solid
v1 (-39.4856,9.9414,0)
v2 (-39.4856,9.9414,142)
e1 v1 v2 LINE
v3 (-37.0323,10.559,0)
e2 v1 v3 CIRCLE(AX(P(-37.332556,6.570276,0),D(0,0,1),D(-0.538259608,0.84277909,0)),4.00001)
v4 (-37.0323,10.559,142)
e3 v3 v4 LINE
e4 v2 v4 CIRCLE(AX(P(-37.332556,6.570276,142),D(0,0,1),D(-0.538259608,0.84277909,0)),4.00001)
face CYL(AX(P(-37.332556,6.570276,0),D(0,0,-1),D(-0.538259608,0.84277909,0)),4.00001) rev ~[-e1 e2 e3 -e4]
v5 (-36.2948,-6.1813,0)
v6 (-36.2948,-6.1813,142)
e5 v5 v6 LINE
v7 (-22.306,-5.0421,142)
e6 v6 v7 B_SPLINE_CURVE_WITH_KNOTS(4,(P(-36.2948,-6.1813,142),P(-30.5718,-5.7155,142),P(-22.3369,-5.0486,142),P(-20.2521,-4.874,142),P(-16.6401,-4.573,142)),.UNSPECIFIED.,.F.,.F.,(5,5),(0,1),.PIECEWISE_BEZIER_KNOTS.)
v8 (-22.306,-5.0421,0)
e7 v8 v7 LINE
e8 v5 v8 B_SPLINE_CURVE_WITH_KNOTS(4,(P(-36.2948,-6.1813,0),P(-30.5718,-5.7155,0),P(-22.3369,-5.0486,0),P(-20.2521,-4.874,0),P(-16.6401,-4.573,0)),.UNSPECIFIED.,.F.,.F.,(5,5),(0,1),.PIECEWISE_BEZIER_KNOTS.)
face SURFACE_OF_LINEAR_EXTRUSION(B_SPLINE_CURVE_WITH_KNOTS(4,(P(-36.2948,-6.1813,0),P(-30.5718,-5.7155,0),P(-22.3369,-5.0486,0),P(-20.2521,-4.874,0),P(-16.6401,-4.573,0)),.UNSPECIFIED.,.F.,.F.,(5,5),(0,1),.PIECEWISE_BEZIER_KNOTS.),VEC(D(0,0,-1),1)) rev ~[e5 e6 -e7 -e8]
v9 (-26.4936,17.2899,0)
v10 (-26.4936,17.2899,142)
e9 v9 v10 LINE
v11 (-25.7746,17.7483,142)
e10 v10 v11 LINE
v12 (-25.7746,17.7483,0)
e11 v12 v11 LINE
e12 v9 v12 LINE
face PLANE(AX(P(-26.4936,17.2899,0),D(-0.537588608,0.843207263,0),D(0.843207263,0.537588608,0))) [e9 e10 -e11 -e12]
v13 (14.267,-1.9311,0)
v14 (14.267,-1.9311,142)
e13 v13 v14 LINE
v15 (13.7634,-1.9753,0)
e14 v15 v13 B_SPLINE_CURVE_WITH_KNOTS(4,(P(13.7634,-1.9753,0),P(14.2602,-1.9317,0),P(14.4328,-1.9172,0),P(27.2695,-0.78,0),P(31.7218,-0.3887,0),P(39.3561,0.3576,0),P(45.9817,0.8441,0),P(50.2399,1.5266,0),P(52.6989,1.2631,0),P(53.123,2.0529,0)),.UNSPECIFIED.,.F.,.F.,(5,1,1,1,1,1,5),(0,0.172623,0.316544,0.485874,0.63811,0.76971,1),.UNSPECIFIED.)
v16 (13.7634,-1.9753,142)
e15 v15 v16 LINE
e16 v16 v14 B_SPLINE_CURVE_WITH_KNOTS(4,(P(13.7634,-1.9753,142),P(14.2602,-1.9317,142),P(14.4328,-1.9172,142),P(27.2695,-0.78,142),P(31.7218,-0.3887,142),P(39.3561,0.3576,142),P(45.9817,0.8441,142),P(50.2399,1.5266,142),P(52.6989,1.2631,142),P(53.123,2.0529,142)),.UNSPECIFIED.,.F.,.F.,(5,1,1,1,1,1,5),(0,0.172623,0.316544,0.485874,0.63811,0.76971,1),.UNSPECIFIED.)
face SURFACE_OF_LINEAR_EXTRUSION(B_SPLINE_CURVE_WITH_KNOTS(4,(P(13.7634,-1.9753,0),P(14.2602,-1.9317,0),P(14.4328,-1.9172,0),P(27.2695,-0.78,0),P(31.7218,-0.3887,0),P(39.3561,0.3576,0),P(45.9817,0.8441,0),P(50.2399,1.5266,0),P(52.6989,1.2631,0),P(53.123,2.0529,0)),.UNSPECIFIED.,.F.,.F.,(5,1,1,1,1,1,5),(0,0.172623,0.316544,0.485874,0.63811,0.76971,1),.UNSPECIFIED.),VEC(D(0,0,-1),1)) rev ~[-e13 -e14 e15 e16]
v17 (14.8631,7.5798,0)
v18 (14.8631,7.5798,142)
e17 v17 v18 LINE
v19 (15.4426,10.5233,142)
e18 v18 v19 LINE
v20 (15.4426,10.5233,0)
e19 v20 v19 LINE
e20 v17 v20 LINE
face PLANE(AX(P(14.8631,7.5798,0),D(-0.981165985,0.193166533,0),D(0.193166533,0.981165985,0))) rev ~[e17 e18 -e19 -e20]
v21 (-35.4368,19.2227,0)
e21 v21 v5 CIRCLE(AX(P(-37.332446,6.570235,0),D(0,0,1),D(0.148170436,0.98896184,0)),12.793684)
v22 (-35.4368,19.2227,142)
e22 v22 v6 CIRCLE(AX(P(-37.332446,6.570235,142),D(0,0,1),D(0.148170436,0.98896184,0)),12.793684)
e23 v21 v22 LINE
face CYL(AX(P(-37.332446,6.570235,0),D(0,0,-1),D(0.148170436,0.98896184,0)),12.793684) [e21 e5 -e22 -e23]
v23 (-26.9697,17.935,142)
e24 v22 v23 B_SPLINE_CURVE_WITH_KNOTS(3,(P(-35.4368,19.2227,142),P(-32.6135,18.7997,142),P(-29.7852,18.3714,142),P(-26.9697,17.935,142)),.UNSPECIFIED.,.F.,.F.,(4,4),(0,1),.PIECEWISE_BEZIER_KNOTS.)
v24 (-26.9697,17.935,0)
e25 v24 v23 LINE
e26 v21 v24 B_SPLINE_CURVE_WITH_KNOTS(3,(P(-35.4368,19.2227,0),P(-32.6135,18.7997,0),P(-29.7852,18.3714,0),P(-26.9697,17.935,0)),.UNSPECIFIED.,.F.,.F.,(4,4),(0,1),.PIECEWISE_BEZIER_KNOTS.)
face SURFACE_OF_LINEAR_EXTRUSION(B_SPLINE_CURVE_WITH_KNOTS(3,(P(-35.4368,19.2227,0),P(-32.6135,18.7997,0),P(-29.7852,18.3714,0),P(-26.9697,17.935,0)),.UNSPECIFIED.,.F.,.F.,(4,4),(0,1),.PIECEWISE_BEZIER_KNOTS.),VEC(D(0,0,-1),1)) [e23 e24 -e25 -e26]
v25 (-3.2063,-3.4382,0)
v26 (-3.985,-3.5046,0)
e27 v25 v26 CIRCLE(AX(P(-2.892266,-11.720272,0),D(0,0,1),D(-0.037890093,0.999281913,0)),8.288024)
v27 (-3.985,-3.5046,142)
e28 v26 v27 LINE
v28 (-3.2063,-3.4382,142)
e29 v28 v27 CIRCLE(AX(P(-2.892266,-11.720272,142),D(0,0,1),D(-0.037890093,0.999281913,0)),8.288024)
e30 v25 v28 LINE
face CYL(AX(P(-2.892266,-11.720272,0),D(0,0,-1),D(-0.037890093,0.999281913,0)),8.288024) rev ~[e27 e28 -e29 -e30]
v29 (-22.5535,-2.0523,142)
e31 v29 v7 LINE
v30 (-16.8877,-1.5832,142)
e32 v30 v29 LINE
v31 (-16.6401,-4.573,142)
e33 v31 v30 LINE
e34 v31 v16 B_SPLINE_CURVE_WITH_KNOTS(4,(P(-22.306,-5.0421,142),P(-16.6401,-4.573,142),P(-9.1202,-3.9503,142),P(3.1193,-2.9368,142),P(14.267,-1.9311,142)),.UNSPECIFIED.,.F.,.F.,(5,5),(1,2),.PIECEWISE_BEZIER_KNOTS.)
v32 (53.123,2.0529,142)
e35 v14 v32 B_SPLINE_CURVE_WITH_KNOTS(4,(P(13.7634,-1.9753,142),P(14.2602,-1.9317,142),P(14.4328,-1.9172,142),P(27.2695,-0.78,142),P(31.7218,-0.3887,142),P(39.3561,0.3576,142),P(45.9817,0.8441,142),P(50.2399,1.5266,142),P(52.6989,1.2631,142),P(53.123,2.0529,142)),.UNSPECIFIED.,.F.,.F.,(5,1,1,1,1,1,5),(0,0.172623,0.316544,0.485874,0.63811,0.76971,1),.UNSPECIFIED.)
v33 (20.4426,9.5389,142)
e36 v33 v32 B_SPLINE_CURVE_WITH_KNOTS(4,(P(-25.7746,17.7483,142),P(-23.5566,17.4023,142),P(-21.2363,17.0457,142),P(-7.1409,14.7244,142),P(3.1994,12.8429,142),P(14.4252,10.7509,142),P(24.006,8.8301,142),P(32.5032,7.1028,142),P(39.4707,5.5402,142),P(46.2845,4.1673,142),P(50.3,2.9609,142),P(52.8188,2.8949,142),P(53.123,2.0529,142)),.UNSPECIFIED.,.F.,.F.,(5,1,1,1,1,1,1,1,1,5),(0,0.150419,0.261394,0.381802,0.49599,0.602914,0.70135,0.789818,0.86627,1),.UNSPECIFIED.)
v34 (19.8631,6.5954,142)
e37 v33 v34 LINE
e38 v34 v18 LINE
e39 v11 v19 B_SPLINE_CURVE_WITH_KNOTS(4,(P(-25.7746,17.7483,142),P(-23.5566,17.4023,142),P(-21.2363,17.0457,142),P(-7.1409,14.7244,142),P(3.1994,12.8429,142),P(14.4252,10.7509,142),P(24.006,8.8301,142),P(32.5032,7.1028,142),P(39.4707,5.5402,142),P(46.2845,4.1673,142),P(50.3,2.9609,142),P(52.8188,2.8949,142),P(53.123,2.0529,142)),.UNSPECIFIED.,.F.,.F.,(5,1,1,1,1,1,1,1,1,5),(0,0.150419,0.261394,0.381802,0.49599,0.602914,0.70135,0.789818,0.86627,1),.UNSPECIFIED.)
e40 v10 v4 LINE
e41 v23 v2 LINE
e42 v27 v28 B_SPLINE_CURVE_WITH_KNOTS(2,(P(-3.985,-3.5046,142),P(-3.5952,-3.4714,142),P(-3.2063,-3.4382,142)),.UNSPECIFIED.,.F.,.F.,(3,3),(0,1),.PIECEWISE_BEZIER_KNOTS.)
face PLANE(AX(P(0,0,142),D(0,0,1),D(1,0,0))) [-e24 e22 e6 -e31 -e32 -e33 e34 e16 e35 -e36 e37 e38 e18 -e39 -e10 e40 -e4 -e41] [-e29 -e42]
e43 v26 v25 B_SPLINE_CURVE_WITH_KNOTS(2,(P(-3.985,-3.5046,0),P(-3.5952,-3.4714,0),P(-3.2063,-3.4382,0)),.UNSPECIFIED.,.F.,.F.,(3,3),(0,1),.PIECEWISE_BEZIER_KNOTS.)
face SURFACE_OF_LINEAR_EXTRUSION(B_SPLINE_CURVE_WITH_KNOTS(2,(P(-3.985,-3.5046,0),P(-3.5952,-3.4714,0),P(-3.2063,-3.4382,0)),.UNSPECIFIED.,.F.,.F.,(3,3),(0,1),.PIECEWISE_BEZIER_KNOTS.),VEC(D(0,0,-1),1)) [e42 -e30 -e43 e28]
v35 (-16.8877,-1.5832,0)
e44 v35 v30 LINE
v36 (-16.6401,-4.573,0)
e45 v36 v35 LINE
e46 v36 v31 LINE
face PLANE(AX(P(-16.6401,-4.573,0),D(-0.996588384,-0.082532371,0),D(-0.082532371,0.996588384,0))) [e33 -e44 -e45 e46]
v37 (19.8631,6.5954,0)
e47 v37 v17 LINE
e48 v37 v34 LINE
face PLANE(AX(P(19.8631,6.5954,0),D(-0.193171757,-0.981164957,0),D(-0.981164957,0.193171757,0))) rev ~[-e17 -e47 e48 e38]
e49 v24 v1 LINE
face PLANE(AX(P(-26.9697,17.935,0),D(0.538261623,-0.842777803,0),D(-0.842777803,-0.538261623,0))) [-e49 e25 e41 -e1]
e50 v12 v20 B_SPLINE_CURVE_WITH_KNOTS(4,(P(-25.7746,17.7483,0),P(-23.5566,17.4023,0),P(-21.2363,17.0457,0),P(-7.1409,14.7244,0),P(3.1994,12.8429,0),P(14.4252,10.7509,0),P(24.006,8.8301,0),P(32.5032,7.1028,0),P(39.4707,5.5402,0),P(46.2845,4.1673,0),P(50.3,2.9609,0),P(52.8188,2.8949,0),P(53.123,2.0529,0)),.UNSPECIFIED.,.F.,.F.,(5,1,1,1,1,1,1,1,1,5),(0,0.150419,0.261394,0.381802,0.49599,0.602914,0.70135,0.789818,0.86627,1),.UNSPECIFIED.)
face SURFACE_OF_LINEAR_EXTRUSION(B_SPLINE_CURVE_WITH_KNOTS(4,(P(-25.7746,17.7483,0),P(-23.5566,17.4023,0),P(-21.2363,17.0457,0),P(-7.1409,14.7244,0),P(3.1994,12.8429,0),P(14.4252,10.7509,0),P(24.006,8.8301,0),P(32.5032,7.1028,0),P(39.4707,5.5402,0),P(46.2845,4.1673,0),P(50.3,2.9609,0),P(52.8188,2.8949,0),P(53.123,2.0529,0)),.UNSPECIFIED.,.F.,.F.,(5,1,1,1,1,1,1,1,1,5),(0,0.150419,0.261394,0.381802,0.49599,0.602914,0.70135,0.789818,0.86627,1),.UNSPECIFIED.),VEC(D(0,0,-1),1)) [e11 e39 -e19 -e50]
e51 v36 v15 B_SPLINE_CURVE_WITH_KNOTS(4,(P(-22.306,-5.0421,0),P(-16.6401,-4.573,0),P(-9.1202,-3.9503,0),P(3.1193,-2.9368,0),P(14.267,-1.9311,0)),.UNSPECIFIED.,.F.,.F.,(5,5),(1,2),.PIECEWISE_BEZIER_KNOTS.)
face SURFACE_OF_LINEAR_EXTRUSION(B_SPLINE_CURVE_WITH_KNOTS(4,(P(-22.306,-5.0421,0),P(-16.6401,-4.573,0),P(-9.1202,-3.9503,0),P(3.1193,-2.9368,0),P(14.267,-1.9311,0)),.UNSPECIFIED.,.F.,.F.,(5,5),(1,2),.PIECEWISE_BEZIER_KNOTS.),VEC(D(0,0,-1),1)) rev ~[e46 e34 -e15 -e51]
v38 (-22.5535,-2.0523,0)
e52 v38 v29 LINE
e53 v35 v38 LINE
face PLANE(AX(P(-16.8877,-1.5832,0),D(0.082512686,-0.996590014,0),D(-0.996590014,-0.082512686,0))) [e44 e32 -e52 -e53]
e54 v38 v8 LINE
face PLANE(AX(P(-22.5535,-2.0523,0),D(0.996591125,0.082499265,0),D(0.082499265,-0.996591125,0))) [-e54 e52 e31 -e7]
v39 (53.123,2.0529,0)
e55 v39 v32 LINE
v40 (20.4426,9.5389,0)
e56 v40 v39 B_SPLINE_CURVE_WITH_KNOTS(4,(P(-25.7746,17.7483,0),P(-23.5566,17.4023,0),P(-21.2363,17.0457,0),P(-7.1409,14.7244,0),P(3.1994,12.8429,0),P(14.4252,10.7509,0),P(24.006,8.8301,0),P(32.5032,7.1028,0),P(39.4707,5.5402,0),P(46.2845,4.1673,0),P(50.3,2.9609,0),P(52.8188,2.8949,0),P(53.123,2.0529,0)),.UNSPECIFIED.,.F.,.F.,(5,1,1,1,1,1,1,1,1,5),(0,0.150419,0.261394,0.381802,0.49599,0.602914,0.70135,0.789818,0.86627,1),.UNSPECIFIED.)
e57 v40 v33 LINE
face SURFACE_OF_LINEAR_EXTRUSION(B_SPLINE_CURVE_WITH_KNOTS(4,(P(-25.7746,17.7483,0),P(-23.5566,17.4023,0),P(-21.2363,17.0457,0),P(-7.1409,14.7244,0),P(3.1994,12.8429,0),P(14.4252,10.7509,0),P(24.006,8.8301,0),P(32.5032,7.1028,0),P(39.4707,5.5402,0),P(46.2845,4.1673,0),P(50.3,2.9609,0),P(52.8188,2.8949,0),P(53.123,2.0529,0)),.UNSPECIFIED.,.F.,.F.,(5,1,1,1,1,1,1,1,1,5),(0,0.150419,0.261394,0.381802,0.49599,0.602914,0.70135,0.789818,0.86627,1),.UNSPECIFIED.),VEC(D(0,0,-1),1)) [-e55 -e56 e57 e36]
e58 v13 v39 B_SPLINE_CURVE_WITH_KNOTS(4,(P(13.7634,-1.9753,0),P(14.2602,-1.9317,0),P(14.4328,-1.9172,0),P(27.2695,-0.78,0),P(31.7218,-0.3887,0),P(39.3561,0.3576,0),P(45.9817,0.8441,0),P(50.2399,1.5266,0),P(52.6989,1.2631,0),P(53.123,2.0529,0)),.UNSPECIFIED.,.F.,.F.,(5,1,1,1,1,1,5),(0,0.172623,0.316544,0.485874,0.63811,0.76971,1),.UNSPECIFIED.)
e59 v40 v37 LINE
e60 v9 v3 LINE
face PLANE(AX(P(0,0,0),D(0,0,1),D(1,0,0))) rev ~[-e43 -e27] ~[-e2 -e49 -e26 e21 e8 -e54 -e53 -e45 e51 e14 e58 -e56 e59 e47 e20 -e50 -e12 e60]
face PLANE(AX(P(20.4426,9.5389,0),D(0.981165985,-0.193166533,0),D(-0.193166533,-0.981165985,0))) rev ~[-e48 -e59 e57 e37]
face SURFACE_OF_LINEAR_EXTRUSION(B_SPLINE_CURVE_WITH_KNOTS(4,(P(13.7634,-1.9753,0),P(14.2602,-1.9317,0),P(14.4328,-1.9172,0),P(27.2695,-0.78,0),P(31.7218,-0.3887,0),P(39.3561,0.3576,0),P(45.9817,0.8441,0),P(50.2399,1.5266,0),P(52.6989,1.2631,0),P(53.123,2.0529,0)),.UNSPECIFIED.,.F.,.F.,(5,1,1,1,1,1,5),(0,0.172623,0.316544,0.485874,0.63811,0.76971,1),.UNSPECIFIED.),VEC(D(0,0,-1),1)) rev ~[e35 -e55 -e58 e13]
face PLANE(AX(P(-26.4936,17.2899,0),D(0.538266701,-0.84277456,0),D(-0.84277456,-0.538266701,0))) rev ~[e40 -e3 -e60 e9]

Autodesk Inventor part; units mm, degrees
ref_plane "YZ Plane" through (0, 0, 0) normal (1, 0, 0) x (0, 1, 0)
ref_plane "XZ Plane" through (0, 0, 0) normal (0, 1, 0) x (-1, 0, 0)
ref_plane "XY Plane" through (0, 0, 0) normal (0, 0, 1) x (1, 0, 0)
sketch "Sketch1" plane through (0, 0, 0) normal (0, 0, 1) x (1, 0, 0)
  line L0 (14.8631, 7.5798) -> (15.4426, 10.5233)
  line L1 (19.8631, 6.5954) -> (14.8631, 7.5798)
  line L2 (20.4426, 9.5389) -> (19.8631, 6.5954)
  line L3 (15.4426, 10.5233) -> (20.4426, 9.5389)
  spline S0 degree 2 poles (-23.8666, 11.2126) (-23.7579, 11.1965) (-23.6493, 11.1804) knots 0 0 0 1 1 1
  line L4 (-23.6714, 11.1837) -> (-23.6271, 11.1771) construction
  arc A0 (-23.6315, 11.1777) -> (-23.667, 11.183) centre (-39.2289, -93.6435) ccw construction
  line L5 (-16.6401, -4.573) -> (-16.8877, -1.5832)
  line L6 (-16.8877, -1.5832) -> (-22.5535, -2.0523)
  line L7 (-22.5535, -2.0523) -> (-22.306, -5.0421)
  line L8 (-22.306, -5.0421) -> (-16.6401, -4.573)
  arc A1 (-35.4368, 19.2227) -> (-36.2948, -6.1813) centre (-37.3325, 6.5703) ccw
  arc A2 (-39.4856, 9.9414) -> (-37.0323, 10.559) centre (-37.3325, 6.5703) ccw
  arc A3 (-3.2063, -3.4382) -> (-3.985, -3.5046) centre (-2.8932, -11.7051) ccw
  line L9 (-18.6283, -4.7387) -> (-14.6519, -4.4072) construction
  arc A4 (-15.0495, -4.4405) -> (-18.2307, -4.7057) centre (808.5789, -9970.4655) ccw construction
  spline S1 degree 4 poles (-36.2948, -6.1813) (-30.5718, -5.7155) (-22.3369, -5.0486) (-20.2521, -4.874) (-16.6401, -4.573) knots 0 0 0 0 0 1 1 1 1 1
  line L10 (-3.2856, -3.445) -> (-3.1269, -3.4314) construction
  arc A5 (-3.2697, -3.4436) -> (-3.1428, -3.4328) centre (-407.6993, 4735.9123) ccw construction
  spline S2 degree 2 poles (-3.985, -3.5046) (-3.5952, -3.4714) (-3.2063, -3.4382) knots 0 0 0 1 1 1
  spline S3 degree 4 poles (13.7634, -1.9753) (14.2602, -1.9317) (14.4328, -1.9172) (27.2695, -0.78) (31.7218, -0.3887) (39.3561, 0.3576) (45.9817, 0.8441) (50.2399, 1.5266) (52.6989, 1.2631) (53.123, 2.0529) knots 0 0 0 0 0 0.172623 0.316544 0.485874 0.63811 0.76971 1 1 1 1 1
  line L11 (9.1543, -2.3795) -> (18.3725, -1.5711) construction
  arc A6 (17.4512, -1.6584) -> (10.0767, -2.3052) centre (105.4782, -1047.7355) ccw construction
  line L12 (-22.306, -5.0421) -> (-16.6401, -4.573) construction
  line L13 (-16.6401, -4.573) -> (-9.1202, -3.9503) construction
  line L14 (-9.1202, -3.9503) -> (3.1193, -2.9368) construction
  line L15 (3.1193, -2.9368) -> (14.267, -1.9311) construction
  spline S4 degree 4 poles (-22.306, -5.0421) (-16.6401, -4.573) (-9.1202, -3.9503) (3.1193, -2.9368) (14.267, -1.9311) knots 1 1 1 1 1 2 2 2 2 2
  line L16 (-26.9697, 17.935) -> (-39.4856, 9.9414)
  spline S5 degree 3 poles (-35.4368, 19.2227) (-32.6135, 18.7997) (-29.7852, 18.3714) (-26.9697, 17.935) knots 0 0 0 0 1 1 1 1
  spline S6 degree 4 poles (-25.7746, 17.7483) (-23.5566, 17.4023) (-21.2363, 17.0457) (-7.1409, 14.7244) (3.1994, 12.8429) (14.4252, 10.7509) (24.006, 8.8301) (32.5032, 7.1028) (39.4707, 5.5402) (46.2845, 4.1673) (50.3, 2.9609) (52.8188, 2.8949) (53.123, 2.0529) knots 0 0 0 0 0 0.150419 0.261394 0.381802 0.49599 0.602914 0.70135 0.789818 0.86627 1 1 1 1 1
  line L17 (-27.8314, 18.0686) -> (-26.108, 17.8015) construction
  arc A7 (-26.2805, 17.8271) -> (-27.6591, 18.0417) centre (-215.1303, -1196.0826) ccw construction
  line L18 (-26.4936, 17.2899) -> (-37.0323, 10.559)
  line L19 (-26.4936, 17.2899) -> (-25.7746, 17.7483)
  line L20 (-34.0391, 19.0376) -> (-17.51, 16.4591) construction
  arc A8 (-19.1659, 16.6985) -> (-32.389, 18.7613) centre (-210.9554, -1169.3442) ccw construction
  point P0 (0, 0)
  point P1 (17.1316, -7.3867)
  point P2 (-0.812, 3.0577)
  point P3 (53.123, 2.0529)
  point P4 (3.869, 12.7089)
  point P5 (14.924, 10.6239)
  point P6 (24.749, 8.6739)
  point P7 (33.239, 6.9129)
  point P8 (40.31, 5.3889)
  point P9 (45.884, 4.1529)
  point P10 (49.91, 3.2409)
  point P11 (52.34, 2.6829)
  point P12 (-9.1202, -3.9503)
  point P13 (3.1193, -2.9368)
  point P14 (32.813, -0.2751)
  point P15 (40.001, 0.3819)
  point P16 (45.677, 0.9099)
  point P17 (49.781, 1.2969)
  point P18 (52.262, 1.5339)
  point P19 (-50.1188, 7.0059)
  point P20 (53.123, 2.4939)
  point P21 (-50.119, 21.2889)
  point P22 (-50.929, -7.3431)
  point P23 (53.123, 1.6119)
  point P24 (-35.437, 6.5548)
  point P25 (-21.448, 6.0472)
  point P26 (-8.296, 5.5021)
  point P27 (3.869, 4.9385)
  point P28 (14.924, 4.3755)
  point P29 (24.749, 3.8355)
  point P30 (33.239, 3.3384)
  point P31 (40.31, 2.8998)
  point P32 (45.884, 2.5411)
  point P33 (49.91, 2.2751)
  point P34 (52.34, 2.1119)
  point P35 (-24.2098, 1.051)
  point P36 (11.5574, 4.345)
  point P37 (-18.271, 10.3498)
  point P38 (-13.0102, 9.4738)
  point P39 (-8.1442, 8.6074)
  point P40 (-3.7222, 7.7734)
  point P41 (0.2078, 6.9934)
  point P42 (3.6038, 6.289)
  point P43 (6.4322, 5.6794)
  point P44 (8.6618, 5.185)
  point P45 (10.2722, 4.8202)
  point P46 (11.2442, 4.597)
  point P47 (-18.6142, 1.507)
  point P48 (-13.3402, 1.9474)
  point P49 (-8.4454, 2.365)
  point P50 (-3.985, 2.7514)
  point P51 (-0.0106, 3.103)
  point P52 (3.4334, 3.4138)
  point P53 (6.3086, 3.6766)
  point P54 (8.579, 3.8878)
  point P55 (10.2206, 4.0426)
  point P56 (11.213, 4.1374)
  point P57 (13.7634, -1.9753)
  point P58 (-26.5962, 17.8762)
  point P59 (-16.6401, -4.5728)
  dimension "d0" = 3
  dimension "d1" = 5
  dimension "d2" = 52.7751
  dimension "d3" = 3
  dimension "d4" = 5.6658
  dimension "d5" = 8
  dimension "d10" = 0.8
extrude "Extrusion2" add sketch "Sketch1" along normal blind 142 contours L1 L2 S6 S3 S4 L5 L6 L7 S1 A1 S5 L16 A2 L18 L19 L0
properties part number "2P.03.01.02.IM.AileronBody"
